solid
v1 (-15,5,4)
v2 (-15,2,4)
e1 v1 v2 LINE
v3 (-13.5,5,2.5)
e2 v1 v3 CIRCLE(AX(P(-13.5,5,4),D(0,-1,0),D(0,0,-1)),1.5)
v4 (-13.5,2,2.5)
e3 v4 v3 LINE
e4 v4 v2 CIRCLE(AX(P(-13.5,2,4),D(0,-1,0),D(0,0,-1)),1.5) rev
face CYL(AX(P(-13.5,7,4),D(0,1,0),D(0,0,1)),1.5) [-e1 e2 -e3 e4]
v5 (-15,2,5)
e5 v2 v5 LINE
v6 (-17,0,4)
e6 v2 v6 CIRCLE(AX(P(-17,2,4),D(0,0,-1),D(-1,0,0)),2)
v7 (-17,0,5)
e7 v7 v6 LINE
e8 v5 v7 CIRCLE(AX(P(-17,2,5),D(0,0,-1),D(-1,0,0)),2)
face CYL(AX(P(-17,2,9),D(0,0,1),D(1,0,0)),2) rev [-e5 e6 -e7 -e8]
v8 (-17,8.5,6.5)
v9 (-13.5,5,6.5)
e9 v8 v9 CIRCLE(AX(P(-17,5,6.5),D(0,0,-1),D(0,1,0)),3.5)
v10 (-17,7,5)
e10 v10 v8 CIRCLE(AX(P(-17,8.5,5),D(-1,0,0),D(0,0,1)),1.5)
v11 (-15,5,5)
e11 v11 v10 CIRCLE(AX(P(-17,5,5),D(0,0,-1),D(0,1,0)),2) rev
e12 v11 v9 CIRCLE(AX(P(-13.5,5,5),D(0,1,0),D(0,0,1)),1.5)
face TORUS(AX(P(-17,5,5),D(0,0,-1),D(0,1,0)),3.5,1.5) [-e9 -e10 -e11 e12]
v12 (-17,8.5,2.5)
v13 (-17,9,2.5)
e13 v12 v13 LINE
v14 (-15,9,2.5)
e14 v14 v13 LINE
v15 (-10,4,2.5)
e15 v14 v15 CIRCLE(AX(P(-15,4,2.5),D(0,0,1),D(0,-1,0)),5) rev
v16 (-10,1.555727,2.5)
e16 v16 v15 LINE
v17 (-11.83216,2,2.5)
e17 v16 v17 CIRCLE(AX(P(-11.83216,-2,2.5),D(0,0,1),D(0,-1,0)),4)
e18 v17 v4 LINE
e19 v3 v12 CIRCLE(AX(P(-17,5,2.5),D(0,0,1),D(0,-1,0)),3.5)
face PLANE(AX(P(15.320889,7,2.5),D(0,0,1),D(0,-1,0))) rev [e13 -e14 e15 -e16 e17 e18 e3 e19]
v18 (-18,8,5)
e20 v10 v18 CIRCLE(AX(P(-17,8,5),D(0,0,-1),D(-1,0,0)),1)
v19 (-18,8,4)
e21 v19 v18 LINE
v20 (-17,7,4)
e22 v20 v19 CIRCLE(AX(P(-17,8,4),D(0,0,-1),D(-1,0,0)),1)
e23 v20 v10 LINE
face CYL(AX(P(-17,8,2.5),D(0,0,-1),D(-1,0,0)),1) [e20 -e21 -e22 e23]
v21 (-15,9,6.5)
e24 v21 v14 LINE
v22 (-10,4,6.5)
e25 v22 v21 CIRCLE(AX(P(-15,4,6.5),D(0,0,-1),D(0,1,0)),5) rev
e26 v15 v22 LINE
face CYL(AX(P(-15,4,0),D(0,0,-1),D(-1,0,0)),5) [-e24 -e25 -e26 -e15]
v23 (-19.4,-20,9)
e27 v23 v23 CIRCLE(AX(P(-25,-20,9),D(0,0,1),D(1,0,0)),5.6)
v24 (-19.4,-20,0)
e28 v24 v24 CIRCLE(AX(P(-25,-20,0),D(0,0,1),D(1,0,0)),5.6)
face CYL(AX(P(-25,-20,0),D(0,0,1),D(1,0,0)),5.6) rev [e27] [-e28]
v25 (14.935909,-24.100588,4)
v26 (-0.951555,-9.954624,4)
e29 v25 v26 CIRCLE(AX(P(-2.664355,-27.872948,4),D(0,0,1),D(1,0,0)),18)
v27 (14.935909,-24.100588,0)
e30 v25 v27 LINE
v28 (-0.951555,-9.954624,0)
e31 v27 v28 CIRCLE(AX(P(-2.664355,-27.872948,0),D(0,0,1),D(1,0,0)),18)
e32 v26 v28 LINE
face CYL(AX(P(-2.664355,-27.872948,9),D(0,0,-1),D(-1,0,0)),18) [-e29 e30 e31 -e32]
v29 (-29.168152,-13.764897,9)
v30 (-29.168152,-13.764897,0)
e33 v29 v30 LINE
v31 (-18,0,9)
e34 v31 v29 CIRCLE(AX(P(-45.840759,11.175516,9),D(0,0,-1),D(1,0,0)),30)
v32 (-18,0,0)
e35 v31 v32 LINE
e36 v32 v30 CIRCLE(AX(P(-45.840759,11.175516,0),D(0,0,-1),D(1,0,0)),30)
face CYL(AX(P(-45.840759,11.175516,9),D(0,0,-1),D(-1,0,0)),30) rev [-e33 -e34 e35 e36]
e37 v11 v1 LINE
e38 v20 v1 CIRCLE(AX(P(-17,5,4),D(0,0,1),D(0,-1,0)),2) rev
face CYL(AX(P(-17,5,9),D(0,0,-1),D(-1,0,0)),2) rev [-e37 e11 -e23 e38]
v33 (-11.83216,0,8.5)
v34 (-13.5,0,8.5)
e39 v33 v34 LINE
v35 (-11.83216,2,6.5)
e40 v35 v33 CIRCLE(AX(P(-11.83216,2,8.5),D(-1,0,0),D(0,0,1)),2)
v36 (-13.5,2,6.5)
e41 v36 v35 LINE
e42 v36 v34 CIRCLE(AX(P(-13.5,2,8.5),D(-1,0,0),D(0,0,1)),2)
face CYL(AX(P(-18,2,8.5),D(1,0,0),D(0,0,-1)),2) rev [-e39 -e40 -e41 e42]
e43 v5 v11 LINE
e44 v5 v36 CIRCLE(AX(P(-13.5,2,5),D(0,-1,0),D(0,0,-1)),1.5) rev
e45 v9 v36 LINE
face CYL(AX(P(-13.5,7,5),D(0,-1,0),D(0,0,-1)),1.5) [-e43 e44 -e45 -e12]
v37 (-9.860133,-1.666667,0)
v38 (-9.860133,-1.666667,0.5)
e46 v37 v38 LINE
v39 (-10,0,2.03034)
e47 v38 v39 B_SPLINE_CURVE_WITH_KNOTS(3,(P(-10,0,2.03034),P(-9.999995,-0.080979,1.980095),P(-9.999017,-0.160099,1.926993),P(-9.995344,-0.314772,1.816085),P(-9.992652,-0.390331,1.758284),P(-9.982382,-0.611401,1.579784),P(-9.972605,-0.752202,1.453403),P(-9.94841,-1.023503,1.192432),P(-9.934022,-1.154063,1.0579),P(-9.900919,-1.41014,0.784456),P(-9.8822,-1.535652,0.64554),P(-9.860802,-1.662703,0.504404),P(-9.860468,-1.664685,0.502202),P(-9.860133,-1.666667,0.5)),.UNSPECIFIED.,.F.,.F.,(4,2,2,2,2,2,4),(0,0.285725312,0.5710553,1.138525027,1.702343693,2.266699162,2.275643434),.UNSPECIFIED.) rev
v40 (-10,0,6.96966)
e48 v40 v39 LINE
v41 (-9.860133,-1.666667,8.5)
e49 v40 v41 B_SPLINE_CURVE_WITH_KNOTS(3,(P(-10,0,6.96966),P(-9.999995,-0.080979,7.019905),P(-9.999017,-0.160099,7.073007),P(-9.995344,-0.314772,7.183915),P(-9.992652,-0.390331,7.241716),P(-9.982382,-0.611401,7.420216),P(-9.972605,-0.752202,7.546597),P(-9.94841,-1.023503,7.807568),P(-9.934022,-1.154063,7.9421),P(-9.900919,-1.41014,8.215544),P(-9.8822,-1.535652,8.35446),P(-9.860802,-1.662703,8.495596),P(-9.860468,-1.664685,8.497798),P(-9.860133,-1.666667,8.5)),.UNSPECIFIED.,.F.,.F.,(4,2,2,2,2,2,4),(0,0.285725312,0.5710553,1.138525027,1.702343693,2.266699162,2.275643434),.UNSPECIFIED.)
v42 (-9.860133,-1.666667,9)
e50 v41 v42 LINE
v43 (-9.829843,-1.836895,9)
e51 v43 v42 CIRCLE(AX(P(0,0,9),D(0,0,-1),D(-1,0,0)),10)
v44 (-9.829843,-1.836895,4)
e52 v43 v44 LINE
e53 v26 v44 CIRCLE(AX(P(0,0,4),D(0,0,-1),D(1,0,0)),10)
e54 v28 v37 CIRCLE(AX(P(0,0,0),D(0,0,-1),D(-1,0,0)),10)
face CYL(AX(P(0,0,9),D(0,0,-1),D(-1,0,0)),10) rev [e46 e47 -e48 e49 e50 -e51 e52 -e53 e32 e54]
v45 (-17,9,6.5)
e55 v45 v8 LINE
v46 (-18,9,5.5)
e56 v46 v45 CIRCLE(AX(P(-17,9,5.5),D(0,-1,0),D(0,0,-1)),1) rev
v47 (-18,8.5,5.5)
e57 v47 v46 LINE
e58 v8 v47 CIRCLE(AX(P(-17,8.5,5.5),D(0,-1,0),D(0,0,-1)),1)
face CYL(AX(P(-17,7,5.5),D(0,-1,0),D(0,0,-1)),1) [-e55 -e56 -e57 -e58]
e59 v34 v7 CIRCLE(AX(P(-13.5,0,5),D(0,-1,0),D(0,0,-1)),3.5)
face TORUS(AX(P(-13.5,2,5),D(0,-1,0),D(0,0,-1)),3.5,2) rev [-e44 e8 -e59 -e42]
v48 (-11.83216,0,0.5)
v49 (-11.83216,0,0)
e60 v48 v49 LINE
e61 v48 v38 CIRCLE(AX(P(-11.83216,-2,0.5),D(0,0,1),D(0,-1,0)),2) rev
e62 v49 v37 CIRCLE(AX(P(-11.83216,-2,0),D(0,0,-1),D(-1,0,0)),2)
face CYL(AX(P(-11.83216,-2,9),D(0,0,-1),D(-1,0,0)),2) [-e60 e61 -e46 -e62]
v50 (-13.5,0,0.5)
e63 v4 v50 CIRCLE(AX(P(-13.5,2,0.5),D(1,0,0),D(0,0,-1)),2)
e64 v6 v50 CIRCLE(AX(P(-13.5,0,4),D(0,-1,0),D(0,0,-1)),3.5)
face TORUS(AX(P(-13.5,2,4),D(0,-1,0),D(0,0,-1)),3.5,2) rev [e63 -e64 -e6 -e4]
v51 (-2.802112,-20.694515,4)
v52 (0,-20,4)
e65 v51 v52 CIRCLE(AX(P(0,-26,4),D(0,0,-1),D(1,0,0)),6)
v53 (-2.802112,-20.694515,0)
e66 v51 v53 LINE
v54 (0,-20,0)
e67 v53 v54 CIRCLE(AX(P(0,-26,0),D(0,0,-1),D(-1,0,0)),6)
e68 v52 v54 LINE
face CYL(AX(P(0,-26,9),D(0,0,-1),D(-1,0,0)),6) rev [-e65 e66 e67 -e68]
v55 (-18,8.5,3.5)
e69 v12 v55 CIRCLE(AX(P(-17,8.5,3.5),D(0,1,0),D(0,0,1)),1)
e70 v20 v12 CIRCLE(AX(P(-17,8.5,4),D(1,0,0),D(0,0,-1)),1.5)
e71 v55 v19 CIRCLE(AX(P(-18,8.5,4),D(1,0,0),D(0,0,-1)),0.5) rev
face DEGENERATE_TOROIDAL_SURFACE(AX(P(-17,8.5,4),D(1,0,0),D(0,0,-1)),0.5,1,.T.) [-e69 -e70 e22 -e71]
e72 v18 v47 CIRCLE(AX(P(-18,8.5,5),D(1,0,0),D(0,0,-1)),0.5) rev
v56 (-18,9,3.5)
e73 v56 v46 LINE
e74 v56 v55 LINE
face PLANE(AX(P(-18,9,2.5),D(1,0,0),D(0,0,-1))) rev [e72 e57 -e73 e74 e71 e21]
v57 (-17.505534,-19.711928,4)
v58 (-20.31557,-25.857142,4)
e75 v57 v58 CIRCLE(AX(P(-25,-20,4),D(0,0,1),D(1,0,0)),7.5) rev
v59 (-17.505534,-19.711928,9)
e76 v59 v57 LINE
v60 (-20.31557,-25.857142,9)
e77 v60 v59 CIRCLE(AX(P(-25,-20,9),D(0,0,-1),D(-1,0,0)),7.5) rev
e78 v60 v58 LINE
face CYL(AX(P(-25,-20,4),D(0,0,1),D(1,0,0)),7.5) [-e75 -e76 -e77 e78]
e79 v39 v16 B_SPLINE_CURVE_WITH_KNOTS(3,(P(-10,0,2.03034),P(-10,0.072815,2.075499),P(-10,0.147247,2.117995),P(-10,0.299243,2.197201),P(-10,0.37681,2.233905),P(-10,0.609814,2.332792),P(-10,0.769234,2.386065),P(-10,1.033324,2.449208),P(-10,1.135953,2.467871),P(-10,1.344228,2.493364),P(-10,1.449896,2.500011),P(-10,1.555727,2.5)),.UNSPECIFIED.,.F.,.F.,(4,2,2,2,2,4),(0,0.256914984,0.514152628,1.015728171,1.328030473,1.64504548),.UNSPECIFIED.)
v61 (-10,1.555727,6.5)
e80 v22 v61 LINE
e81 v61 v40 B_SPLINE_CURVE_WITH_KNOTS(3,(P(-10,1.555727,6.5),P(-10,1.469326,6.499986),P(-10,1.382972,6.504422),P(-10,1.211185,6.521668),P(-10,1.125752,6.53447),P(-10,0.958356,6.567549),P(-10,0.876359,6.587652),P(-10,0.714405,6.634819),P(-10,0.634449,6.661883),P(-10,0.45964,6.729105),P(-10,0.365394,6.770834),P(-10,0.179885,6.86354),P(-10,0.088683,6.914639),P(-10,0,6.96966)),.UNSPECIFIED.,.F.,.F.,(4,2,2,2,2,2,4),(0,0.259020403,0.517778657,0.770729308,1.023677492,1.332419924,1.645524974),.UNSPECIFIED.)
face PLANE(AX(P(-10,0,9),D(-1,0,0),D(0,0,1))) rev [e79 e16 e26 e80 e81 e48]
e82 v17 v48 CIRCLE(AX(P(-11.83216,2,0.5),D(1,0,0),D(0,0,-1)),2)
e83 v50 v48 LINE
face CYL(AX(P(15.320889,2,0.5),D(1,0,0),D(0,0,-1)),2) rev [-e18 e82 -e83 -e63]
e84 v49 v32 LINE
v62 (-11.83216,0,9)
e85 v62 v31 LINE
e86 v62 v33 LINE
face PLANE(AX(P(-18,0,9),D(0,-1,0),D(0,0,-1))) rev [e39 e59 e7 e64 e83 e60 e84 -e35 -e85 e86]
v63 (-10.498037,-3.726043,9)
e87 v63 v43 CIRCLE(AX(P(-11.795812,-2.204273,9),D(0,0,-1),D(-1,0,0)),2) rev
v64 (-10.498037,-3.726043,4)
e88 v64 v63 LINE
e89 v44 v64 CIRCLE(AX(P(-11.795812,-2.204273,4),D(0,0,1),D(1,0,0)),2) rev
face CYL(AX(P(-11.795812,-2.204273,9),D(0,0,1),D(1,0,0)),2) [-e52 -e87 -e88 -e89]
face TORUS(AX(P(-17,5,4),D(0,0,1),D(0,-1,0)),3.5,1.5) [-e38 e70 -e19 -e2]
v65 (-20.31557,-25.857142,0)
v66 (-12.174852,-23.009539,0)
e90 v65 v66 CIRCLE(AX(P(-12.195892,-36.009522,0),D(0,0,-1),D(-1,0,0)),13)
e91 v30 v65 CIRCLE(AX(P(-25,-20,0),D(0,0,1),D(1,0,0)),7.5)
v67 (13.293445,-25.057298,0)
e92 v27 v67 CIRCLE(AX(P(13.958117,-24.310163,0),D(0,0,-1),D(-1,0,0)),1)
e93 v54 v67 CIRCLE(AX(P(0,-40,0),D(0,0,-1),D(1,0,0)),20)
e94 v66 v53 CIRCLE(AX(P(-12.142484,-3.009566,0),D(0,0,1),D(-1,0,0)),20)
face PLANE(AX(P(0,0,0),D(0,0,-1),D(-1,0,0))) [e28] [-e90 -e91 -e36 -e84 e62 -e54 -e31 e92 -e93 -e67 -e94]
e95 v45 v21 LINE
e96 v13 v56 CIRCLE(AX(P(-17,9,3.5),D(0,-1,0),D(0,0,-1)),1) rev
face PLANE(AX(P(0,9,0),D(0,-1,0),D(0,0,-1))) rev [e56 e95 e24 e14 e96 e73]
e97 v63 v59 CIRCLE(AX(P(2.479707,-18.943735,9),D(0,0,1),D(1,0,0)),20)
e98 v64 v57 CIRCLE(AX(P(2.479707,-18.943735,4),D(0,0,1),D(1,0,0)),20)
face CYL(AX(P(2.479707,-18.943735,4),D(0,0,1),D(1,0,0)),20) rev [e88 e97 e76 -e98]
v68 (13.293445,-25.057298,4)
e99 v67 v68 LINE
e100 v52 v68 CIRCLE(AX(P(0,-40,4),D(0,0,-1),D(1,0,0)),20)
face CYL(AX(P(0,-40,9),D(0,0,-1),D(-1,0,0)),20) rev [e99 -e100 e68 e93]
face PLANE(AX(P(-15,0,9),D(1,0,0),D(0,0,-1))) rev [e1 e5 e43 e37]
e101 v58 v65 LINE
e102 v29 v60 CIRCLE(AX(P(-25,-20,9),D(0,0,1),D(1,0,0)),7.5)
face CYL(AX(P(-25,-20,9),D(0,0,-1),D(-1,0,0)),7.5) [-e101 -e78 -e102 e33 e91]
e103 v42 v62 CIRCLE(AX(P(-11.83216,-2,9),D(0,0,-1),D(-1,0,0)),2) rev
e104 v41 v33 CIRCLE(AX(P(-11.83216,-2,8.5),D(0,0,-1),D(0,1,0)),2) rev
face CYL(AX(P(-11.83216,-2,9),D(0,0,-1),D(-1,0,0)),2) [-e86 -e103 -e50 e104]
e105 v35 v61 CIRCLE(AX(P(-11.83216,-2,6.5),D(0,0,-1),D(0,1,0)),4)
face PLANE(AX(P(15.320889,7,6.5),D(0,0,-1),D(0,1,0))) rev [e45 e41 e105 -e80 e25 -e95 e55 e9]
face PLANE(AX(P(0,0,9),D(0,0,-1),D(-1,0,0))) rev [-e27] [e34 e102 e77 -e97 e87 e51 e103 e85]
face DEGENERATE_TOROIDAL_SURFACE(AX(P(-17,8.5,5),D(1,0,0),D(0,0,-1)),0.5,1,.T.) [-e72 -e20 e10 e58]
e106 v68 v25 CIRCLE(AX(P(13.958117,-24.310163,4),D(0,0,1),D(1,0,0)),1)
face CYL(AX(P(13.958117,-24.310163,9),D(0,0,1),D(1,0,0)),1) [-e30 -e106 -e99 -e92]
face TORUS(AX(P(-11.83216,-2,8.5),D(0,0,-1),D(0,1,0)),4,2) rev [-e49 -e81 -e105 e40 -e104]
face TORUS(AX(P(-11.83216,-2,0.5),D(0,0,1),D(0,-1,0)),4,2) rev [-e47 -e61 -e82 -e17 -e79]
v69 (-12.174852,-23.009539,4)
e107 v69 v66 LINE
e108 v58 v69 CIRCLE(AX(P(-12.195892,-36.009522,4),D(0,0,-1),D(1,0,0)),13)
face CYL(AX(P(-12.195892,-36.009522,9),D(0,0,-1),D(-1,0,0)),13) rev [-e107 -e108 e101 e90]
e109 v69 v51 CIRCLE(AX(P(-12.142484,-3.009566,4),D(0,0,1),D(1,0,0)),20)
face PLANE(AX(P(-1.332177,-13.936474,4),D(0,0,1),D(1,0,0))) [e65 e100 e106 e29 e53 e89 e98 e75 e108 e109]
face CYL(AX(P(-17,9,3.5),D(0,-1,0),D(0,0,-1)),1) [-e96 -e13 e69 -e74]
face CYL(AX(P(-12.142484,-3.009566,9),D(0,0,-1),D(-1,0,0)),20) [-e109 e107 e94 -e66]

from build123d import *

# Parameters (mm, degrees)
EXTRUDE_1_DEPTH     = 9
CUT_EXTRUDE_START   = -5
CUT_EXTRUDE_1_DEPTH = 5
SKETCH_12_W         = 2.5
SKETCH_12_H         = 7
CUT_EXTRUDE_3_DEPTH = 42.911887352
FILLET_11_R         = 2
FILLET_1_R          = 1
SKETCH_10_W         = 8
SKETCH_10_H         = 4
EXTRUDE_3_DEPTH     = 2
FILLET_5_R          = 5
FILLET_10_R         = 7.5
FILLET_14_R         = 2
FILLET_15_R         = 1.5
FILLET_16_R         = 2
FILLET_17_R         = 1
FILLET_18_R         = 2
SKETCH_11_R         = 5.6
CUT_EXTRUDE_2_DEPTH = 44.514365603


# Some blends are built 0.0001 mm under size
with BuildPart() as part:
    # Эскиз2 → Бобышка-Вытянуть1 (new body)
    with BuildSketch(Plane.XY):
        with BuildLine():
            Line((-18, 0), (-15, 0))
            Line((-15, 0), (-15, 7))
            Line((-15, 7), (-10, 7))
            Line((-10, 7), (-10, 0))
            ThreePointArc((-10, 0), (-7.39984978, -6.726233956), (-0.951555354, -9.954624172))
            ThreePointArc((-0.951555354, -9.954624172), (10.407523967, -15.498539394), (15.320888862, -27.144247806))
            ThreePointArc((15.320888862, -27.144247806), (8.452365235, -21.873844259), (0, -20))
            ThreePointArc((0, -20), (-1.44344914, -20.176216472), (-2.802111775, -20.69451514))
            ThreePointArc((-2.802111775, -20.69451514), (-7.346697493, -22.426064476), (-12.174852362, -23.009539415))
            ThreePointArc((-12.174852362, -23.009539415), (-16.488233618, -23.738589268), (-20.315570084, -25.857142338))
            ThreePointArc((-20.315570084, -25.857142338), (-31.05163084, -24.430323259), (-29.168151763, -13.764896883))
            ThreePointArc((-29.168151763, -13.764896883), (-22.544234788, -7.726123715), (-18, 0))
        make_face()
    extrude(amount=EXTRUDE_1_DEPTH)

    # Эскиз6 → Вырез-Вытянуть1 (cut)
    with BuildSketch(Plane.XY.offset(9).offset(CUT_EXTRUDE_START)):
        with BuildLine():
            ThreePointArc((-9.55, -2.96605799), (-16.390256677, -12.316180922), (-16.898984287, -23.890078556))
            ThreePointArc((-16.898984287, -23.890078556), (-14.577958647, -23.229625817), (-12.174852362, -23.009539415))
            ThreePointArc((-12.174852362, -23.009539415), (-7.346697493, -22.426064476), (-2.802111775, -20.69451514))
            ThreePointArc((-2.802111775, -20.69451514), (-1.44344914, -20.176216472), (0, -20))
            ThreePointArc((0, -20), (8.452365235, -21.873844259), (15.320888862, -27.144247806))
            ThreePointArc((15.320888862, -27.144247806), (10.407523967, -15.498539394), (-0.951555354, -9.954624172))
            ThreePointArc((-0.951555354, -9.954624172), (-6.307192762, -7.760110789), (-9.55, -2.96605799))
        make_face()
    extrude(amount=CUT_EXTRUDE_1_DEPTH, mode=Mode.SUBTRACT)

    # Эскиз12 → Вырез-Вытянуть3 (cut, through all)
    with BuildSketch(Plane.ZY.offset(15)):
        with Locations((1.25, 3.5)):
            Rectangle(SKETCH_12_W, SKETCH_12_H)
        with Locations((7.75, 3.5)):
            Rectangle(SKETCH_12_W, SKETCH_12_H)
    extrude(amount=-CUT_EXTRUDE_3_DEPTH, mode=Mode.SUBTRACT)

    # Скругление11
    fillet_11_edges = [part.edges().sort_by_distance(p)[0] for p in [
        (-10, 0, 7.75),
        (-10, 0, 1.25),
    ]]
    fillet(fillet_11_edges, radius=FILLET_11_R)

    # Скругление1
    fillet_1_edges = [part.edges().sort_by_distance(p)[0] for p in [
        (15.320888862, -27.144247806, 2),
    ]]
    fillet(fillet_1_edges, radius=FILLET_1_R)

    # Эскиз10 → Бобышка-Вытянуть3 (add)
    with BuildSketch(Plane(origin=(0, 7, 0), x_dir=(-1, 0, 0), z_dir=(0, 1, 0))):
        with Locations((14, 4.5)):
            Rectangle(SKETCH_10_W, SKETCH_10_H)
    extrude(amount=EXTRUDE_3_DEPTH)

    # Скругление5
    fillet_5_edges = [part.edges().sort_by_distance(p)[0] for p in [
        (-10, 9, 4.5),
    ]]
    fillet(fillet_5_edges, radius=FILLET_5_R)

    # Скругление10
    fillet_10_edges = [part.edges().sort_by_distance(p)[0] for p in [
        (-16.898984287, -23.890078556, 6.5),
    ]]
    fillet(fillet_10_edges, radius=FILLET_10_R - 0.0001)  # a hair under: the kernel refuses the full size

    # Скругление14
    fillet_14_edges = [part.edges().sort_by_distance(p)[0] for p in [
        (-15, 7, 4.5),
    ]]
    fillet(fillet_14_edges, radius=FILLET_14_R)

    # Скругление15
    fillet_15_edges = [part.edges().sort_by_distance(p)[0] for p in [
        (-17.5, 7, 6.5),
        (-15, 2.5, 6.5),
        (-17.5, 7, 2.5),
        (-15.585786438, 6.414213562, 2.5),
        (-15.585786438, 6.414213562, 6.5),
        (-15, 2.5, 2.5),
    ]]
    fillet(fillet_15_edges, radius=FILLET_15_R)

    # Скругление16
    # the kernel refuses this fillet: 2 mm, written as the material it adds along each edge
    with BuildSketch(Plane(origin=(-11.832159566, -2, 6.5), x_dir=(-0.6907726827654878, -0.7230719886325089, 0), z_dir=(-0.7230719886325089, 0.6907726827654878, 0))) as fillet_16_piece_1_section:
        with BuildLine():
            CenterArc((2 + FILLET_16_R, FILLET_16_R), FILLET_16_R, 180, 90)
            Line((2, FILLET_16_R), (2, 0))
            Line((2, 0), (2 + FILLET_16_R, 0))
        make_face()
    fillet_16_piece_1 = revolve(axis=Axis((-11.832159566, -2, 6.5), (0, 0, 1)), revolution_arc=223.691304566, mode=Mode.PRIVATE)
    fillet_16_piece_1 = split(fillet_16_piece_1, bisect_by=Plane(origin=(-9.962064569, 0, 7.231915875), z_dir=(0, -1, 0)), keep=Keep.TOP, mode=Mode.PRIVATE)
    fillet_16_piece_1 = fillet_16_piece_1 - Plane(origin=(0, 0, 7.231915875), x_dir=(-1, 0, 0), z_dir=(0, 0, -1)) * Cylinder(10, 17, mode=Mode.PRIVATE)
    fillet_16_piece_1 = fillet_16_piece_1 - Plane(origin=(2.479707116, -18.943734501, 7.231915875), x_dir=(-0.6014853558135568, 0.7988838255602869, 0), z_dir=(0, 0, -1)) * Cylinder(20, 17, mode=Mode.PRIVATE)
    add(fillet_16_piece_1)
    with BuildSketch(Plane(origin=(-11.832159566, -2, 6.5), x_dir=(-0.6907726827654878, -0.7230719886325089, 0), z_dir=(-0.7230719886325089, 0.6907726827654878, 0))) as fillet_16_piece_2_section:
        with BuildLine():
            CenterArc((2 + FILLET_16_R, FILLET_16_R), FILLET_16_R, 180, 90)
            Line((2, FILLET_16_R), (2, 0))
            Line((2, 0), (2 + FILLET_16_R, 0))
        make_face()
    fillet_16_piece_2 = revolve(axis=Axis((-11.832159566, -2, 6.5), (0, 0, 1)), revolution_arc=223.691304566, mode=Mode.PRIVATE)
    fillet_16_piece_2 = split(fillet_16_piece_2, bisect_by=Plane(origin=(-11.088968436, 0, 6.841402023), z_dir=(0, 1, 0)), keep=Keep.TOP, mode=Mode.PRIVATE)
    fillet_16_piece_2 = split(fillet_16_piece_2, bisect_by=Plane(origin=(-10, 0.441530369, 6.841402023), z_dir=(-1, 0, 0)), keep=Keep.TOP, mode=Mode.PRIVATE)
    add(fillet_16_piece_2)
    with BuildSketch(Plane(origin=(-13.5, 0, 6.5), x_dir=(0, 0, 1), z_dir=(1, 0, 0))) as fillet_16_piece_3:
        with BuildLine():
            CenterArc((FILLET_16_R, -FILLET_16_R), FILLET_16_R, 90, 90)
            Line((0, -FILLET_16_R), (0, 0))
            Line((0, 0), (FILLET_16_R, 0))
        make_face()
    extrude(amount=1.667840434)
    with BuildSketch(Plane(origin=(-11.832159566, -2, 2.5), x_dir=(-0.6907726827654875, -0.7230719886325091, 0), z_dir=(-0.7230719886325091, 0.6907726827654875, 0))) as fillet_16_piece_4_section:
        with BuildLine():
            CenterArc((2 + FILLET_16_R, -FILLET_16_R), FILLET_16_R, 90, 90)
            Line((2, -FILLET_16_R), (2, 0))
            Line((2, 0), (2 + FILLET_16_R, 0))
        make_face()
    fillet_16_piece_4 = revolve(axis=Axis((-11.832159566, -2, 2.5), (0, 0, 1)), revolution_arc=223.691304566, mode=Mode.PRIVATE)
    fillet_16_piece_4 = split(fillet_16_piece_4, bisect_by=Plane(origin=(-9.962064569, 0, 1.768084125), z_dir=(0, -1, 0)), keep=Keep.TOP, mode=Mode.PRIVATE)
    fillet_16_piece_4 = fillet_16_piece_4 - Plane(origin=(0, 0, 1.768084125), x_dir=(-1, 0, 0), z_dir=(0, 0, -1)) * Cylinder(10, 17, mode=Mode.PRIVATE)
    add(fillet_16_piece_4)
    with BuildSketch(Plane(origin=(-11.832159566, -2, 2.5), x_dir=(-0.6907726827654875, -0.7230719886325091, 0), z_dir=(-0.7230719886325091, 0.6907726827654875, 0))) as fillet_16_piece_5_section:
        with BuildLine():
            CenterArc((2 + FILLET_16_R, -FILLET_16_R), FILLET_16_R, 90, 90)
            Line((2, -FILLET_16_R), (2, 0))
            Line((2, 0), (2 + FILLET_16_R, 0))
        make_face()
    fillet_16_piece_5 = revolve(axis=Axis((-11.832159566, -2, 2.5), (0, 0, 1)), revolution_arc=223.691304566, mode=Mode.PRIVATE)
    fillet_16_piece_5 = split(fillet_16_piece_5, bisect_by=Plane(origin=(-10, 0.441530341, 2.15859789), z_dir=(-1, 0, 0)), keep=Keep.TOP, mode=Mode.PRIVATE)
    add(fillet_16_piece_5)
    with BuildSketch(Plane(origin=(-13.5, 0, 2.5), x_dir=(0, 0, -1), z_dir=(1, 0, 0))) as fillet_16_piece_6:
        with BuildLine():
            CenterArc((FILLET_16_R, FILLET_16_R), FILLET_16_R, 180, 90)
            Line((0, FILLET_16_R), (0, 0))
            Line((0, 0), (FILLET_16_R, 0))
        make_face()
    extrude(amount=1.667840434)
    with BuildSketch(Plane(origin=(-13.5, 0, 4), x_dir=(0, 0, -1), z_dir=(1, 0, 0))) as fillet_16_piece_7:
        with BuildLine():
            CenterArc((1.5 + FILLET_16_R, FILLET_16_R), FILLET_16_R, 180, 90)
            Line((1.5 + FILLET_16_R, 0), (1.5, 0))
            Line((1.5, 0), (1.5, FILLET_16_R))
        make_face()
    revolve(axis=Axis((-13.5, 0, 4), (0, 1, 0)), revolution_arc=90)
    with BuildSketch(Plane(origin=(-15, 0, 4), x_dir=(0, 1, 0), z_dir=(0, 0, 1))) as fillet_16_piece_8:
        with BuildLine():
            CenterArc((FILLET_16_R, FILLET_16_R), FILLET_16_R, 180, 90)
            Line((0, FILLET_16_R), (0, 0))
            Line((0, 0), (FILLET_16_R, 0))
        make_face()
    extrude(amount=1)
    with BuildSketch(Plane(origin=(-13.5, 0, 5), x_dir=(0, 0, 1), z_dir=(1, 0, 0))) as fillet_16_piece_9:
        with BuildLine():
            CenterArc((1.5 + FILLET_16_R, -FILLET_16_R), FILLET_16_R, 90, 90)
            Line((1.5 + FILLET_16_R, 0), (1.5, 0))
            Line((1.5, 0), (1.5, -FILLET_16_R))
        make_face()
    revolve(axis=Axis((-13.5, 0, 5), (0, -1, 0)), revolution_arc=90)

    # Скругление17
    fillet_17_edges = [part.edges().sort_by_distance(p)[0] for p in [
        (-18, 8.75, 2.5),
        (-18, 7.439339828, 2.939339828),
        (-18, 7, 4.5),
        (-18, 8.75, 6.5),
        (-18, 7.439339828, 6.060660172),
    ]]
    fillet(fillet_17_edges, radius=FILLET_17_R - 0.0001)  # a hair under: the kernel refuses the full size

    # Скругление18
    fillet_18_edges = [part.edges().sort_by_distance(p)[0] for p in [
        (-9.55, -2.96605799, 5.25),
    ]]
    fillet(fillet_18_edges, radius=FILLET_18_R)

    # Эскиз11 → Вырез-Вытянуть2 (cut, through all)
    with BuildSketch(Plane.XY.offset(9)):
        with Locations((-25, -20)):
            Circle(SKETCH_11_R)
    extrude(amount=-CUT_EXTRUDE_2_DEPTH, mode=Mode.SUBTRACT)


solid = part.part
